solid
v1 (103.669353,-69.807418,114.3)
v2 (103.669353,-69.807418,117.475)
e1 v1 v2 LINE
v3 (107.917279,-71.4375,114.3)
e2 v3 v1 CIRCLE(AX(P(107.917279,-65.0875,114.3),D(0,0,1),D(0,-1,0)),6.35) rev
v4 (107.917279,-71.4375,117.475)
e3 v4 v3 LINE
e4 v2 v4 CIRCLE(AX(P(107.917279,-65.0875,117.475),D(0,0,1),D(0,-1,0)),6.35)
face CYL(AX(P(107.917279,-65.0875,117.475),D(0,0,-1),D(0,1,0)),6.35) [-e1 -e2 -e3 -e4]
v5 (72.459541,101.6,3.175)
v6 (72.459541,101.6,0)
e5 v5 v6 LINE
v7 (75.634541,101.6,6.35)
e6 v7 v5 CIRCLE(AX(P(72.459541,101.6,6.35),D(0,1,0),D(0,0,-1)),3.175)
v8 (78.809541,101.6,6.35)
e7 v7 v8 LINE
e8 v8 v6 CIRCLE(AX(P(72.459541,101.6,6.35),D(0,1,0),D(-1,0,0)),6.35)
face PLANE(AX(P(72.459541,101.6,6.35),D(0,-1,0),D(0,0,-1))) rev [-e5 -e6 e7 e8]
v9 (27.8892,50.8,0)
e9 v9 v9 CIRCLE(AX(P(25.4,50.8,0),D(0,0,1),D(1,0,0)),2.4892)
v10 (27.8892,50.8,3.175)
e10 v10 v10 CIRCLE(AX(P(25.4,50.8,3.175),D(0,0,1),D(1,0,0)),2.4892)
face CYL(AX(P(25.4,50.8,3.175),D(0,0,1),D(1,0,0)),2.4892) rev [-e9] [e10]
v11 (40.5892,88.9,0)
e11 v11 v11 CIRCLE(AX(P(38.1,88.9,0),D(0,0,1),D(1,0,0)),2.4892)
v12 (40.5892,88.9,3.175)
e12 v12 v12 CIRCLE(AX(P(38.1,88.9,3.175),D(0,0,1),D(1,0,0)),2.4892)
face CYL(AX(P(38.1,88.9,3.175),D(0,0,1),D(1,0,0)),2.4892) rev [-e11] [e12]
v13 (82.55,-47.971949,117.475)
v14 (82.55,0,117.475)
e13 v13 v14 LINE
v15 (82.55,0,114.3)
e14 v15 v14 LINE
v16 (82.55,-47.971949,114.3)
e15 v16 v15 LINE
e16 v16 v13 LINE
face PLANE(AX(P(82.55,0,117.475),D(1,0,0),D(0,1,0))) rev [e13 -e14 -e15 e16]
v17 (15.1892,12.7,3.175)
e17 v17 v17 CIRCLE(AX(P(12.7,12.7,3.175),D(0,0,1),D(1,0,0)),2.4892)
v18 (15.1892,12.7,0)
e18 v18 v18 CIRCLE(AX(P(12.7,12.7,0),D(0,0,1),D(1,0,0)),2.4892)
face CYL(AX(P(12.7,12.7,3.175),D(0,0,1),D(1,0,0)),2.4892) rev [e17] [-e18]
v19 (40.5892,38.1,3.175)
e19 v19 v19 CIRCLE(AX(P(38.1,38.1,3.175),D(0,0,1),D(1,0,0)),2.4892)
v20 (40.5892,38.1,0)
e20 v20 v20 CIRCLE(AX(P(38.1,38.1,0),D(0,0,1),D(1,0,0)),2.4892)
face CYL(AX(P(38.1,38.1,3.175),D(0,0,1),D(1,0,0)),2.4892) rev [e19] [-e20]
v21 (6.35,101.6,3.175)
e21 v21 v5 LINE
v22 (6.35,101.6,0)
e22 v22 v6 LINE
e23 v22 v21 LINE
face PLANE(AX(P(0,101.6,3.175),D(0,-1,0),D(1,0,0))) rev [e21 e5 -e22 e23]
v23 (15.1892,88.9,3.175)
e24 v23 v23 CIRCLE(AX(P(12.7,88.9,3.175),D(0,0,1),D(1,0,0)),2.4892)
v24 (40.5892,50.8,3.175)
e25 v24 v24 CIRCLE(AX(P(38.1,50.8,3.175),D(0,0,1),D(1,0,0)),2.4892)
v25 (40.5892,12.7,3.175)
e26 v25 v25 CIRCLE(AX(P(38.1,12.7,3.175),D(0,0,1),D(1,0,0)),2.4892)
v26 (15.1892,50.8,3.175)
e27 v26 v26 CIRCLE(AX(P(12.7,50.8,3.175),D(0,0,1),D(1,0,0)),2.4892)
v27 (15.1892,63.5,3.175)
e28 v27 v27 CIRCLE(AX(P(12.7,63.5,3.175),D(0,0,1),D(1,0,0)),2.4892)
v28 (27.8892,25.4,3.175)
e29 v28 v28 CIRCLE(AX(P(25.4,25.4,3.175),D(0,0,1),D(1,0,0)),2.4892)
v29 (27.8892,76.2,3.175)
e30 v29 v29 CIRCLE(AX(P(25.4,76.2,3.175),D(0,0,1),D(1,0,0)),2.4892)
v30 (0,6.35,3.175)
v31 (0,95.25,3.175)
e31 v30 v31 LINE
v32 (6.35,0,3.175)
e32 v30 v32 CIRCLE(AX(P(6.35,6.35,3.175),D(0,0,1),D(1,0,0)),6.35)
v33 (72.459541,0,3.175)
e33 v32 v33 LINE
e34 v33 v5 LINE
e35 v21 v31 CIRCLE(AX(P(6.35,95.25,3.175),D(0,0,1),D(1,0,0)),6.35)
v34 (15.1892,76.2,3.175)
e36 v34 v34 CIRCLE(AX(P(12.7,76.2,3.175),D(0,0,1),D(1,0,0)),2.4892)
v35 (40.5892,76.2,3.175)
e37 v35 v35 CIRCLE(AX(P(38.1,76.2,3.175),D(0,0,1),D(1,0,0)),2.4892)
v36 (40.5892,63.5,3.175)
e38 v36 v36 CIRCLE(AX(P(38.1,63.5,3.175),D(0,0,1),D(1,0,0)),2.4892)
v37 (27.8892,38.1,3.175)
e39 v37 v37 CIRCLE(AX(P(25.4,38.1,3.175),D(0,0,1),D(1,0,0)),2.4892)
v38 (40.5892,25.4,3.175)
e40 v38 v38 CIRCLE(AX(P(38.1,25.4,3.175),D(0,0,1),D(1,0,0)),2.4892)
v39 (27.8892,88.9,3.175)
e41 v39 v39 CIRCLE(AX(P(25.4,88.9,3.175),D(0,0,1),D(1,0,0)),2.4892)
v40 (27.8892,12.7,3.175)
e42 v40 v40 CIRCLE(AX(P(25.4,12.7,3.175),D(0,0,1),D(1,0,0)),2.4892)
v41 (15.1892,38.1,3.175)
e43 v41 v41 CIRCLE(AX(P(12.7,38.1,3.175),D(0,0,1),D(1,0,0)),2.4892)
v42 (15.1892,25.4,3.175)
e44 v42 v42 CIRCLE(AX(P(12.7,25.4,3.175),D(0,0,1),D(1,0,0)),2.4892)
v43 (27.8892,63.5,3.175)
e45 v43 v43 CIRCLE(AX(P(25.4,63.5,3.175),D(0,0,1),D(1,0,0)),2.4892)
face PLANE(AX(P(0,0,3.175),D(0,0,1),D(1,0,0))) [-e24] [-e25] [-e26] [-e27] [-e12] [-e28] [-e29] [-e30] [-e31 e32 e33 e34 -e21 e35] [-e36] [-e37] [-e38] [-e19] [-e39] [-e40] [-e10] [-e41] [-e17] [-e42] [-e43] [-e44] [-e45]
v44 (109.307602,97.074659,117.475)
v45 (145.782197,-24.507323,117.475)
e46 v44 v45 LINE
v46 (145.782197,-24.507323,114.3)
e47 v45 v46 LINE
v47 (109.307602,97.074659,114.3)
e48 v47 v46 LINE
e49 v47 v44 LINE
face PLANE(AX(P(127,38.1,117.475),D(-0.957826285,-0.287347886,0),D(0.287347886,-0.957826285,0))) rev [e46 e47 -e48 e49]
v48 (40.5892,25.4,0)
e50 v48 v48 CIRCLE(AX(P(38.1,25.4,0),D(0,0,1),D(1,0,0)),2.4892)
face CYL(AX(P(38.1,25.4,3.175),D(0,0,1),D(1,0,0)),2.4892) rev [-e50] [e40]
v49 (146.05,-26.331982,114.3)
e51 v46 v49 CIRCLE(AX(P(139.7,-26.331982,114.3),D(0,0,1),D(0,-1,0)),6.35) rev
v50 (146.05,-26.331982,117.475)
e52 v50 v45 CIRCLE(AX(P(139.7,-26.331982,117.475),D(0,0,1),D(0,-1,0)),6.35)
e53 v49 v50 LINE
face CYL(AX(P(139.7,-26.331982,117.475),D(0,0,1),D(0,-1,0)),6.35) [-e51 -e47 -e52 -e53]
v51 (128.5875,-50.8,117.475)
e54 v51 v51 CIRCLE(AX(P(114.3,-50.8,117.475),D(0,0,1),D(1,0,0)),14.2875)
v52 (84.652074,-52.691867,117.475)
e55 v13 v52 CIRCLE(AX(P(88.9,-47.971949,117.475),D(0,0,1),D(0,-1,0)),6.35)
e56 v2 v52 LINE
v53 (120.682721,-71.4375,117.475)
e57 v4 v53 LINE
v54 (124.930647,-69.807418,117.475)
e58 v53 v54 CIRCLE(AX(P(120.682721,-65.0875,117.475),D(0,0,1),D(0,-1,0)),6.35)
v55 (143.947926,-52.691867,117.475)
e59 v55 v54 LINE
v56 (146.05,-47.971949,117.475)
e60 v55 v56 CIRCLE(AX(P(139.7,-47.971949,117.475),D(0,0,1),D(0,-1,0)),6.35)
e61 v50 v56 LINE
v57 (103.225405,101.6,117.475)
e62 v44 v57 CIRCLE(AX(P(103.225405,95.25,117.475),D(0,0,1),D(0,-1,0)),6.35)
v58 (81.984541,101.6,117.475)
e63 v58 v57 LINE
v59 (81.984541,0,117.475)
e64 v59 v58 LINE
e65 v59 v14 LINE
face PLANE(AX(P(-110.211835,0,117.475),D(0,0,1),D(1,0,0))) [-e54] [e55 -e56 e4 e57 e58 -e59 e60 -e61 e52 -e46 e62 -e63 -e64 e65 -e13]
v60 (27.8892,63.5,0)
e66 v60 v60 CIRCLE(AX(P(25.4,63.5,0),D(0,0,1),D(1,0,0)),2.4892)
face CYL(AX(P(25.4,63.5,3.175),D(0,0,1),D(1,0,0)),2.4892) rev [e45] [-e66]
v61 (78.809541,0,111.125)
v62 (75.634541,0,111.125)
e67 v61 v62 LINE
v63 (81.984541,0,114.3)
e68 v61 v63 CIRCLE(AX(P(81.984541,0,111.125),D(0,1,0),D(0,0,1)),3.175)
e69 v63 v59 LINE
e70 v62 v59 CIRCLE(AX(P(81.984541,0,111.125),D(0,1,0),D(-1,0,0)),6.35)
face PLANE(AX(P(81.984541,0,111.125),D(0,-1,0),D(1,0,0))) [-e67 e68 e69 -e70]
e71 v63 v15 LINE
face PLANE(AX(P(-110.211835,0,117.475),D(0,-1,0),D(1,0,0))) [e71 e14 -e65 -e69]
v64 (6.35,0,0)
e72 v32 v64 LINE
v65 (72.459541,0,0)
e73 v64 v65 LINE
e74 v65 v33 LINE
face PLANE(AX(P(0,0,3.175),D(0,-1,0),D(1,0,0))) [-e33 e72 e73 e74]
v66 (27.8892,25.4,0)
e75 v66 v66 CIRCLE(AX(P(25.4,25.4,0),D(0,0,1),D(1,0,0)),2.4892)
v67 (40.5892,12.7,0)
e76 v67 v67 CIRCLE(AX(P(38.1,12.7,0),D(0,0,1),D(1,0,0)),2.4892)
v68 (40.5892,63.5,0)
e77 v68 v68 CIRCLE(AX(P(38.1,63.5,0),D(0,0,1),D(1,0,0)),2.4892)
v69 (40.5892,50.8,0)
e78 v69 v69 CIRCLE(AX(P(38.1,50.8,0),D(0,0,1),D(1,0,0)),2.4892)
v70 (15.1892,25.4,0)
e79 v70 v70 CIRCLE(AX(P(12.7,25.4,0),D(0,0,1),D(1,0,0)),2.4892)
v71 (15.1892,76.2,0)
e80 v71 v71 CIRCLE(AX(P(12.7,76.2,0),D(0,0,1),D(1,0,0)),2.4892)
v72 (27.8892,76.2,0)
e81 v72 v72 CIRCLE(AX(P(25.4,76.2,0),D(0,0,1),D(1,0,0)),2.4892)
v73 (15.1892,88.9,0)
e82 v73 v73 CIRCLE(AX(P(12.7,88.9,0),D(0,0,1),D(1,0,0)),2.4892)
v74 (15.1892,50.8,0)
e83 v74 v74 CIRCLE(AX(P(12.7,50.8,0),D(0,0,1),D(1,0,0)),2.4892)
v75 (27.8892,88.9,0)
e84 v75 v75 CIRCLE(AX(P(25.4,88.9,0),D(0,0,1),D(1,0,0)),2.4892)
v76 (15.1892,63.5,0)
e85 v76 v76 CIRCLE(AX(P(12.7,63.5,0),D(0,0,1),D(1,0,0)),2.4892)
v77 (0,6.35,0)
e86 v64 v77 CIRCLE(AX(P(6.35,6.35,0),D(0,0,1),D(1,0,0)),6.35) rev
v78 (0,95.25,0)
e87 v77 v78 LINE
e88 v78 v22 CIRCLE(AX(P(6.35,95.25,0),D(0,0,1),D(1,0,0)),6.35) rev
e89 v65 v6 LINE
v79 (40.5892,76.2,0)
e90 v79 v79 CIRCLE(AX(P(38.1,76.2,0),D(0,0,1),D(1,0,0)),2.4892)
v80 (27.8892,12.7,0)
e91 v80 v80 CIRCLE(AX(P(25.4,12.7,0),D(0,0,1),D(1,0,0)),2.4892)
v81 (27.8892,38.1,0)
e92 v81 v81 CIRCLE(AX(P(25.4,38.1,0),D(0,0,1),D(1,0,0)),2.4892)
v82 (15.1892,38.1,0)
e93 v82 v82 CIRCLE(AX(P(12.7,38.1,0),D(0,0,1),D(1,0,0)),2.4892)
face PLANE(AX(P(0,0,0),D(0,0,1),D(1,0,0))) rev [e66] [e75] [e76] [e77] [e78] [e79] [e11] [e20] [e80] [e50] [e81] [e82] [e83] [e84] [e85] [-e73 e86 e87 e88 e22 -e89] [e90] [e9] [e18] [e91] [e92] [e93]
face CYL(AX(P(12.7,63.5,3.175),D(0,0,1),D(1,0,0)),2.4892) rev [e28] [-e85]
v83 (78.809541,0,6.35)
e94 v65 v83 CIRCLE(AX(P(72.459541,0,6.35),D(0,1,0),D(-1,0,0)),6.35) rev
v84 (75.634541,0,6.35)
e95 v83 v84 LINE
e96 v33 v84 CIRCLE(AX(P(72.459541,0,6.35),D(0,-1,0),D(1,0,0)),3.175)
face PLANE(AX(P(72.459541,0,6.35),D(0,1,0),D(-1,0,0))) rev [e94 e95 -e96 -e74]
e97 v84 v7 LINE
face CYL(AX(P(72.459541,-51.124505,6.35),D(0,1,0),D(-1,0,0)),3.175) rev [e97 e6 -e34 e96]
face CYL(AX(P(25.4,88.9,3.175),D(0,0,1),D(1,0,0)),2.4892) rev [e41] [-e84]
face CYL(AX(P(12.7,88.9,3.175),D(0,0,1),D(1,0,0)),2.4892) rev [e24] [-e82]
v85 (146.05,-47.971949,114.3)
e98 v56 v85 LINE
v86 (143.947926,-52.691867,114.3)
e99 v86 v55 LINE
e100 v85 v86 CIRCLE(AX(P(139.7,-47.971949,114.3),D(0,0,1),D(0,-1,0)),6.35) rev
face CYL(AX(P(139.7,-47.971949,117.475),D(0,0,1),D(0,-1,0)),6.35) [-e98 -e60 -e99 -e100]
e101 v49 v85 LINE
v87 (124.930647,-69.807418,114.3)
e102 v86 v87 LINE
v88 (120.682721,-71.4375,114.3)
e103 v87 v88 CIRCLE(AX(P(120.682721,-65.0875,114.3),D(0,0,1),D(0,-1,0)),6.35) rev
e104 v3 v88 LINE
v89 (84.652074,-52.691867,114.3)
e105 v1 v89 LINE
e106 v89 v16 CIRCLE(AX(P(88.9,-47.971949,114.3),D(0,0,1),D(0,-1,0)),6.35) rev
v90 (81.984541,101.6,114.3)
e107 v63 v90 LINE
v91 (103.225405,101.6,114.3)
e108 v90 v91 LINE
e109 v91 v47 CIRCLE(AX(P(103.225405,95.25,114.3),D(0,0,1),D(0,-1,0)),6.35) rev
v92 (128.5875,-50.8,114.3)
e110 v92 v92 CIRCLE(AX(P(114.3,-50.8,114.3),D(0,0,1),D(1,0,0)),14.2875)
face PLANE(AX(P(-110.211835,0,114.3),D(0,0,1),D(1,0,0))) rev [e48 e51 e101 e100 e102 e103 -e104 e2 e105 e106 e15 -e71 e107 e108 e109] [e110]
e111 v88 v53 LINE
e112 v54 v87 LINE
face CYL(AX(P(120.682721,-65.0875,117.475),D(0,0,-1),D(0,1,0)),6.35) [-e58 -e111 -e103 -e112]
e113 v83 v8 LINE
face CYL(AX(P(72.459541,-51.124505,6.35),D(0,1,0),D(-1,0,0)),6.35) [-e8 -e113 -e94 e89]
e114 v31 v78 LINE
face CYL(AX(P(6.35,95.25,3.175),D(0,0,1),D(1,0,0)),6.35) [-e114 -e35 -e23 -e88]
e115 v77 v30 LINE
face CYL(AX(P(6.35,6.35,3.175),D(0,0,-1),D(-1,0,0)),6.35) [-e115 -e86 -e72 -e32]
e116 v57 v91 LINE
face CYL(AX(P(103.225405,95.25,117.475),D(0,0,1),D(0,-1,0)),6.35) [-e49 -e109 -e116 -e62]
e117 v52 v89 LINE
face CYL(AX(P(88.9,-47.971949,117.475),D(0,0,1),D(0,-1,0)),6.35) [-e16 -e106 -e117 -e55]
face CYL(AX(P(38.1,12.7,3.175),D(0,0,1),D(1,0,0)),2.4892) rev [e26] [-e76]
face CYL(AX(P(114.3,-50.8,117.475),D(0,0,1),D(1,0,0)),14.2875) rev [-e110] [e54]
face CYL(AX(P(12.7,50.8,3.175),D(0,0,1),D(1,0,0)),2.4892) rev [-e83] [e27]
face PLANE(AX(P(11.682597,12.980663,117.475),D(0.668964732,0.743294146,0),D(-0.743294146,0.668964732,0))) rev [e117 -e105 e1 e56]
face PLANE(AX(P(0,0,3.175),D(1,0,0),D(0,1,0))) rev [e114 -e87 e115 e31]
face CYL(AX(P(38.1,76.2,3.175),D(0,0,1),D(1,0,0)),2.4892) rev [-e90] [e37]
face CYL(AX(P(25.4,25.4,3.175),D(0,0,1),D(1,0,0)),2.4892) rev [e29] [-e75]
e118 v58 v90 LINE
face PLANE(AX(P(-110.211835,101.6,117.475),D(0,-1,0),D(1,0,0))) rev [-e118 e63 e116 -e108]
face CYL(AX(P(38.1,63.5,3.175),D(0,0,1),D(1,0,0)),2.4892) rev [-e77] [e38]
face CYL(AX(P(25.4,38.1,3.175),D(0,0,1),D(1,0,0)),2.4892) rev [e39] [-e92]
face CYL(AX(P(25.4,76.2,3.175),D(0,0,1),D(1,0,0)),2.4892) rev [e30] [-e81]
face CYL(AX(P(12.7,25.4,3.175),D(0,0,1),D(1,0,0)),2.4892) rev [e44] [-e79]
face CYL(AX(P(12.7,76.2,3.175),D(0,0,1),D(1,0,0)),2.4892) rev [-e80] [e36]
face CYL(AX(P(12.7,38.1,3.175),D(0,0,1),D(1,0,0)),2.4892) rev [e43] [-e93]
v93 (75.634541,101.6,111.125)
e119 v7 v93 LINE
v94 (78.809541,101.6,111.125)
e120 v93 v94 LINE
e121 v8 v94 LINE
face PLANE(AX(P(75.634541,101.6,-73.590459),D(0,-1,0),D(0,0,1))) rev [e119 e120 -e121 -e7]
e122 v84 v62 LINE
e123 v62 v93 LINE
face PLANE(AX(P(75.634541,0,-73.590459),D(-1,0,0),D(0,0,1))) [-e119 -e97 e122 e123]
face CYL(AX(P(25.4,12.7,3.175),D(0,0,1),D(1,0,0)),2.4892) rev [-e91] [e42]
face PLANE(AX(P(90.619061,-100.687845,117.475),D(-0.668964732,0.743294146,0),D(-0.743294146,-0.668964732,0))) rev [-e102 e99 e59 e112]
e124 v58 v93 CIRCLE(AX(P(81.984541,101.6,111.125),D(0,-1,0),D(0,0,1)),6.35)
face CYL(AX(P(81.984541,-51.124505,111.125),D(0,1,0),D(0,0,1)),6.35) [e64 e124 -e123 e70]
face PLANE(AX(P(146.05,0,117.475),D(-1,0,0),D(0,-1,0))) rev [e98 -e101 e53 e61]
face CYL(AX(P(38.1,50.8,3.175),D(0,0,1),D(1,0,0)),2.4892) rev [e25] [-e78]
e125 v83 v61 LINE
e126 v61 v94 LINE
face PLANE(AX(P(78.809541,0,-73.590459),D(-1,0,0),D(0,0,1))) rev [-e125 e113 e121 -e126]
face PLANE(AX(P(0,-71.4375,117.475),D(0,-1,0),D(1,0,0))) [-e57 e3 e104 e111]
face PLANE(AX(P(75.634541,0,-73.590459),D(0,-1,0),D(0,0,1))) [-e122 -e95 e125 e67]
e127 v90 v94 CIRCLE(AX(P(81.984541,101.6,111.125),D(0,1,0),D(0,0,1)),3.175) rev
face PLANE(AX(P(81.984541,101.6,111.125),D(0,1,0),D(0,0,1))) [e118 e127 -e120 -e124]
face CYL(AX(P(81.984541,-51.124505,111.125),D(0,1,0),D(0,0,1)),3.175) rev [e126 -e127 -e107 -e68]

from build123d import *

# Parameters (mm, degrees)
SKETCH1_R           = 2.4892
SKETCH1_R_2         = 14.2875
BOSS_EXTRUDE1_DEPTH = 3.175
JOG1_START          = -71.4375
JOG1_DEPTH          = 173.0375
JOG1_2_DEPTH        = 101.6
JOG1_START_2        = -36.5124999
JOG1_3_OUTLINE_W    = 63.5
JOG1_3_OUTLINE_H    = 3.175
JOG1_3_DEPTH        = 11.1124999
JOG1_START_3        = 114.3
JOG1_4_OUTLINE_R    = 14.2875
JOG1_4_DEPTH        = 3.175
FILLET2_R           = 6.35


with BuildPart() as part:
    # Sketch1 → Boss-Extrude1 (new body)
    with BuildSketch(Plane.XY):
        Polygon((0, 0), (82.55, 0), (82.55, -50.8), (105.480555556, -71.4375), (123.119444444, -71.4375), (146.05, -50.8), (146.05, -25.4), (107.95, 101.6), (0, 101.6), align=None)
        with Locations((12.7, 12.7)):
            Circle(SKETCH1_R, mode=Mode.SUBTRACT)
        with Locations((25.4, 12.7)):
            Circle(SKETCH1_R, mode=Mode.SUBTRACT)
        with Locations((38.1, 12.7)):
            Circle(SKETCH1_R, mode=Mode.SUBTRACT)
        with Locations((12.7, 25.4)):
            Circle(SKETCH1_R, mode=Mode.SUBTRACT)
        with Locations((25.4, 25.4)):
            Circle(SKETCH1_R, mode=Mode.SUBTRACT)
        with Locations((12.7, 38.1)):
            Circle(SKETCH1_R, mode=Mode.SUBTRACT)
        with Locations((12.7, 50.8)):
            Circle(SKETCH1_R, mode=Mode.SUBTRACT)
        with Locations((25.4, 38.1)):
            Circle(SKETCH1_R, mode=Mode.SUBTRACT)
        with Locations((25.4, 50.8)):
            Circle(SKETCH1_R, mode=Mode.SUBTRACT)
        with Locations((38.1, 25.4)):
            Circle(SKETCH1_R, mode=Mode.SUBTRACT)
        with Locations((38.1, 38.1)):
            Circle(SKETCH1_R, mode=Mode.SUBTRACT)
        with Locations((38.1, 50.8)):
            Circle(SKETCH1_R, mode=Mode.SUBTRACT)
        with Locations((12.7, 63.5)):
            Circle(SKETCH1_R, mode=Mode.SUBTRACT)
        with Locations((12.7, 76.2)):
            Circle(SKETCH1_R, mode=Mode.SUBTRACT)
        with Locations((25.4, 63.5)):
            Circle(SKETCH1_R, mode=Mode.SUBTRACT)
        with Locations((25.4, 76.2)):
            Circle(SKETCH1_R, mode=Mode.SUBTRACT)
        with Locations((12.7, 88.9)):
            Circle(SKETCH1_R, mode=Mode.SUBTRACT)
        with Locations((25.4, 88.9)):
            Circle(SKETCH1_R, mode=Mode.SUBTRACT)
        with Locations((38.1, 63.5)):
            Circle(SKETCH1_R, mode=Mode.SUBTRACT)
        with Locations((38.1, 76.2)):
            Circle(SKETCH1_R, mode=Mode.SUBTRACT)
        with Locations((38.1, 88.9)):
            Circle(SKETCH1_R, mode=Mode.SUBTRACT)
        with Locations((114.3, -50.8)):
            Circle(SKETCH1_R_2, mode=Mode.SUBTRACT)
    extrude(amount=BOSS_EXTRUDE1_DEPTH)

    # Jog1: read off the stored shape, not the designer's step
    # Jog1 outline → Jog1 (cut)
    with BuildSketch(Plane(origin=(0, 0, 0), x_dir=(1, 0, 0), z_dir=(0, 1, 0)).offset(JOG1_START)):
        with BuildLine():
            ThreePointArc((72.459541247, 0), (75.634541247, -0.850738686), (77.958802561, -3.175))
            Line((77.958802561, -3.175), (146.05, -3.175))
            Line((146.05, -3.175), (146.05, 0))
            Line((146.05, 0), (72.459541247, 0))
        make_face()
    extrude(amount=JOG1_DEPTH, mode=Mode.SUBTRACT)

    # Jog1 2 outline → Jog1 2 (add)
    with BuildSketch(Plane(origin=(0, 0, 0), x_dir=(1, 0, 0), z_dir=(0, 1, 0))):
        with BuildLine():
            ThreePointArc((72.459541247, -3.175), (74.704605277, -4.10493597), (75.634541247, -6.35))
            Line((75.634541247, -6.35), (75.634541247, -111.125))
            ThreePointArc((75.634541247, -111.125), (77.494413186, -115.615128061), (81.984541247, -117.475))
            Line((81.984541247, -117.475), (82.55, -117.475))
            Line((82.55, -117.475), (82.55, -114.3))
            Line((82.55, -114.3), (81.984541247, -114.3))
            ThreePointArc((81.984541247, -114.3), (79.739477217, -113.37006403), (78.809541247, -111.125))
            Line((78.809541247, -111.125), (78.809541247, -6.35))
            ThreePointArc((78.809541247, -6.35), (78.593170244, -4.706499064), (77.958802561, -3.175))
            Line((77.958802561, -3.175), (72.459541247, -3.175))
        make_face()
    extrude(amount=JOG1_2_DEPTH)



with BuildPart() as body_2:
    # Jog1 3 outline → Jog1 3 (new body)
    with BuildSketch(Plane(origin=(0, 0, 0), x_dir=(1, 0, 0), z_dir=(0, 1, 0)).offset(JOG1_START_2)):
        with Locations((114.3, -115.8875)):
            Rectangle(JOG1_3_OUTLINE_W, JOG1_3_OUTLINE_H)
    extrude(amount=JOG1_3_DEPTH)


with BuildPart() as part_1:
    add(part.part)

    add(body_2.part)  # Jog1 4 merges body 2
    # Jog1 4 outline → Jog1 4 (add)
    with BuildSketch(Plane.XY.offset(JOG1_START_3)):
        Polygon((107.95, 101.6), (81.984541247, 101.6), (81.984541247, 0), (82.55, 0), (82.55, -50.8), (105.480555556, -71.4375), (123.119444444, -71.4375), (146.05, -50.8), (146.05, -25.4), align=None)
        with Locations((114.3, -50.8)):
            Circle(JOG1_4_OUTLINE_R, mode=Mode.SUBTRACT)
    extrude(amount=JOG1_4_DEPTH)

    # Fillet2
    fillet2_edges = [part_1.edges().sort_by_distance(p)[0] for p in [
        (0, 0, 1.5875),
        (0, 101.6, 1.5875),
        (107.95, 101.6, 115.8875),
        (146.05, -25.4, 115.8875),
        (146.05, -50.8, 115.8875),
        (123.119444444, -71.4375, 115.8875),
        (105.480555556, -71.4375, 115.8875),
        (82.55, -50.8, 115.8875),
    ]]
    fillet(fillet2_edges, radius=FILLET2_R)


solid = part_1.part
